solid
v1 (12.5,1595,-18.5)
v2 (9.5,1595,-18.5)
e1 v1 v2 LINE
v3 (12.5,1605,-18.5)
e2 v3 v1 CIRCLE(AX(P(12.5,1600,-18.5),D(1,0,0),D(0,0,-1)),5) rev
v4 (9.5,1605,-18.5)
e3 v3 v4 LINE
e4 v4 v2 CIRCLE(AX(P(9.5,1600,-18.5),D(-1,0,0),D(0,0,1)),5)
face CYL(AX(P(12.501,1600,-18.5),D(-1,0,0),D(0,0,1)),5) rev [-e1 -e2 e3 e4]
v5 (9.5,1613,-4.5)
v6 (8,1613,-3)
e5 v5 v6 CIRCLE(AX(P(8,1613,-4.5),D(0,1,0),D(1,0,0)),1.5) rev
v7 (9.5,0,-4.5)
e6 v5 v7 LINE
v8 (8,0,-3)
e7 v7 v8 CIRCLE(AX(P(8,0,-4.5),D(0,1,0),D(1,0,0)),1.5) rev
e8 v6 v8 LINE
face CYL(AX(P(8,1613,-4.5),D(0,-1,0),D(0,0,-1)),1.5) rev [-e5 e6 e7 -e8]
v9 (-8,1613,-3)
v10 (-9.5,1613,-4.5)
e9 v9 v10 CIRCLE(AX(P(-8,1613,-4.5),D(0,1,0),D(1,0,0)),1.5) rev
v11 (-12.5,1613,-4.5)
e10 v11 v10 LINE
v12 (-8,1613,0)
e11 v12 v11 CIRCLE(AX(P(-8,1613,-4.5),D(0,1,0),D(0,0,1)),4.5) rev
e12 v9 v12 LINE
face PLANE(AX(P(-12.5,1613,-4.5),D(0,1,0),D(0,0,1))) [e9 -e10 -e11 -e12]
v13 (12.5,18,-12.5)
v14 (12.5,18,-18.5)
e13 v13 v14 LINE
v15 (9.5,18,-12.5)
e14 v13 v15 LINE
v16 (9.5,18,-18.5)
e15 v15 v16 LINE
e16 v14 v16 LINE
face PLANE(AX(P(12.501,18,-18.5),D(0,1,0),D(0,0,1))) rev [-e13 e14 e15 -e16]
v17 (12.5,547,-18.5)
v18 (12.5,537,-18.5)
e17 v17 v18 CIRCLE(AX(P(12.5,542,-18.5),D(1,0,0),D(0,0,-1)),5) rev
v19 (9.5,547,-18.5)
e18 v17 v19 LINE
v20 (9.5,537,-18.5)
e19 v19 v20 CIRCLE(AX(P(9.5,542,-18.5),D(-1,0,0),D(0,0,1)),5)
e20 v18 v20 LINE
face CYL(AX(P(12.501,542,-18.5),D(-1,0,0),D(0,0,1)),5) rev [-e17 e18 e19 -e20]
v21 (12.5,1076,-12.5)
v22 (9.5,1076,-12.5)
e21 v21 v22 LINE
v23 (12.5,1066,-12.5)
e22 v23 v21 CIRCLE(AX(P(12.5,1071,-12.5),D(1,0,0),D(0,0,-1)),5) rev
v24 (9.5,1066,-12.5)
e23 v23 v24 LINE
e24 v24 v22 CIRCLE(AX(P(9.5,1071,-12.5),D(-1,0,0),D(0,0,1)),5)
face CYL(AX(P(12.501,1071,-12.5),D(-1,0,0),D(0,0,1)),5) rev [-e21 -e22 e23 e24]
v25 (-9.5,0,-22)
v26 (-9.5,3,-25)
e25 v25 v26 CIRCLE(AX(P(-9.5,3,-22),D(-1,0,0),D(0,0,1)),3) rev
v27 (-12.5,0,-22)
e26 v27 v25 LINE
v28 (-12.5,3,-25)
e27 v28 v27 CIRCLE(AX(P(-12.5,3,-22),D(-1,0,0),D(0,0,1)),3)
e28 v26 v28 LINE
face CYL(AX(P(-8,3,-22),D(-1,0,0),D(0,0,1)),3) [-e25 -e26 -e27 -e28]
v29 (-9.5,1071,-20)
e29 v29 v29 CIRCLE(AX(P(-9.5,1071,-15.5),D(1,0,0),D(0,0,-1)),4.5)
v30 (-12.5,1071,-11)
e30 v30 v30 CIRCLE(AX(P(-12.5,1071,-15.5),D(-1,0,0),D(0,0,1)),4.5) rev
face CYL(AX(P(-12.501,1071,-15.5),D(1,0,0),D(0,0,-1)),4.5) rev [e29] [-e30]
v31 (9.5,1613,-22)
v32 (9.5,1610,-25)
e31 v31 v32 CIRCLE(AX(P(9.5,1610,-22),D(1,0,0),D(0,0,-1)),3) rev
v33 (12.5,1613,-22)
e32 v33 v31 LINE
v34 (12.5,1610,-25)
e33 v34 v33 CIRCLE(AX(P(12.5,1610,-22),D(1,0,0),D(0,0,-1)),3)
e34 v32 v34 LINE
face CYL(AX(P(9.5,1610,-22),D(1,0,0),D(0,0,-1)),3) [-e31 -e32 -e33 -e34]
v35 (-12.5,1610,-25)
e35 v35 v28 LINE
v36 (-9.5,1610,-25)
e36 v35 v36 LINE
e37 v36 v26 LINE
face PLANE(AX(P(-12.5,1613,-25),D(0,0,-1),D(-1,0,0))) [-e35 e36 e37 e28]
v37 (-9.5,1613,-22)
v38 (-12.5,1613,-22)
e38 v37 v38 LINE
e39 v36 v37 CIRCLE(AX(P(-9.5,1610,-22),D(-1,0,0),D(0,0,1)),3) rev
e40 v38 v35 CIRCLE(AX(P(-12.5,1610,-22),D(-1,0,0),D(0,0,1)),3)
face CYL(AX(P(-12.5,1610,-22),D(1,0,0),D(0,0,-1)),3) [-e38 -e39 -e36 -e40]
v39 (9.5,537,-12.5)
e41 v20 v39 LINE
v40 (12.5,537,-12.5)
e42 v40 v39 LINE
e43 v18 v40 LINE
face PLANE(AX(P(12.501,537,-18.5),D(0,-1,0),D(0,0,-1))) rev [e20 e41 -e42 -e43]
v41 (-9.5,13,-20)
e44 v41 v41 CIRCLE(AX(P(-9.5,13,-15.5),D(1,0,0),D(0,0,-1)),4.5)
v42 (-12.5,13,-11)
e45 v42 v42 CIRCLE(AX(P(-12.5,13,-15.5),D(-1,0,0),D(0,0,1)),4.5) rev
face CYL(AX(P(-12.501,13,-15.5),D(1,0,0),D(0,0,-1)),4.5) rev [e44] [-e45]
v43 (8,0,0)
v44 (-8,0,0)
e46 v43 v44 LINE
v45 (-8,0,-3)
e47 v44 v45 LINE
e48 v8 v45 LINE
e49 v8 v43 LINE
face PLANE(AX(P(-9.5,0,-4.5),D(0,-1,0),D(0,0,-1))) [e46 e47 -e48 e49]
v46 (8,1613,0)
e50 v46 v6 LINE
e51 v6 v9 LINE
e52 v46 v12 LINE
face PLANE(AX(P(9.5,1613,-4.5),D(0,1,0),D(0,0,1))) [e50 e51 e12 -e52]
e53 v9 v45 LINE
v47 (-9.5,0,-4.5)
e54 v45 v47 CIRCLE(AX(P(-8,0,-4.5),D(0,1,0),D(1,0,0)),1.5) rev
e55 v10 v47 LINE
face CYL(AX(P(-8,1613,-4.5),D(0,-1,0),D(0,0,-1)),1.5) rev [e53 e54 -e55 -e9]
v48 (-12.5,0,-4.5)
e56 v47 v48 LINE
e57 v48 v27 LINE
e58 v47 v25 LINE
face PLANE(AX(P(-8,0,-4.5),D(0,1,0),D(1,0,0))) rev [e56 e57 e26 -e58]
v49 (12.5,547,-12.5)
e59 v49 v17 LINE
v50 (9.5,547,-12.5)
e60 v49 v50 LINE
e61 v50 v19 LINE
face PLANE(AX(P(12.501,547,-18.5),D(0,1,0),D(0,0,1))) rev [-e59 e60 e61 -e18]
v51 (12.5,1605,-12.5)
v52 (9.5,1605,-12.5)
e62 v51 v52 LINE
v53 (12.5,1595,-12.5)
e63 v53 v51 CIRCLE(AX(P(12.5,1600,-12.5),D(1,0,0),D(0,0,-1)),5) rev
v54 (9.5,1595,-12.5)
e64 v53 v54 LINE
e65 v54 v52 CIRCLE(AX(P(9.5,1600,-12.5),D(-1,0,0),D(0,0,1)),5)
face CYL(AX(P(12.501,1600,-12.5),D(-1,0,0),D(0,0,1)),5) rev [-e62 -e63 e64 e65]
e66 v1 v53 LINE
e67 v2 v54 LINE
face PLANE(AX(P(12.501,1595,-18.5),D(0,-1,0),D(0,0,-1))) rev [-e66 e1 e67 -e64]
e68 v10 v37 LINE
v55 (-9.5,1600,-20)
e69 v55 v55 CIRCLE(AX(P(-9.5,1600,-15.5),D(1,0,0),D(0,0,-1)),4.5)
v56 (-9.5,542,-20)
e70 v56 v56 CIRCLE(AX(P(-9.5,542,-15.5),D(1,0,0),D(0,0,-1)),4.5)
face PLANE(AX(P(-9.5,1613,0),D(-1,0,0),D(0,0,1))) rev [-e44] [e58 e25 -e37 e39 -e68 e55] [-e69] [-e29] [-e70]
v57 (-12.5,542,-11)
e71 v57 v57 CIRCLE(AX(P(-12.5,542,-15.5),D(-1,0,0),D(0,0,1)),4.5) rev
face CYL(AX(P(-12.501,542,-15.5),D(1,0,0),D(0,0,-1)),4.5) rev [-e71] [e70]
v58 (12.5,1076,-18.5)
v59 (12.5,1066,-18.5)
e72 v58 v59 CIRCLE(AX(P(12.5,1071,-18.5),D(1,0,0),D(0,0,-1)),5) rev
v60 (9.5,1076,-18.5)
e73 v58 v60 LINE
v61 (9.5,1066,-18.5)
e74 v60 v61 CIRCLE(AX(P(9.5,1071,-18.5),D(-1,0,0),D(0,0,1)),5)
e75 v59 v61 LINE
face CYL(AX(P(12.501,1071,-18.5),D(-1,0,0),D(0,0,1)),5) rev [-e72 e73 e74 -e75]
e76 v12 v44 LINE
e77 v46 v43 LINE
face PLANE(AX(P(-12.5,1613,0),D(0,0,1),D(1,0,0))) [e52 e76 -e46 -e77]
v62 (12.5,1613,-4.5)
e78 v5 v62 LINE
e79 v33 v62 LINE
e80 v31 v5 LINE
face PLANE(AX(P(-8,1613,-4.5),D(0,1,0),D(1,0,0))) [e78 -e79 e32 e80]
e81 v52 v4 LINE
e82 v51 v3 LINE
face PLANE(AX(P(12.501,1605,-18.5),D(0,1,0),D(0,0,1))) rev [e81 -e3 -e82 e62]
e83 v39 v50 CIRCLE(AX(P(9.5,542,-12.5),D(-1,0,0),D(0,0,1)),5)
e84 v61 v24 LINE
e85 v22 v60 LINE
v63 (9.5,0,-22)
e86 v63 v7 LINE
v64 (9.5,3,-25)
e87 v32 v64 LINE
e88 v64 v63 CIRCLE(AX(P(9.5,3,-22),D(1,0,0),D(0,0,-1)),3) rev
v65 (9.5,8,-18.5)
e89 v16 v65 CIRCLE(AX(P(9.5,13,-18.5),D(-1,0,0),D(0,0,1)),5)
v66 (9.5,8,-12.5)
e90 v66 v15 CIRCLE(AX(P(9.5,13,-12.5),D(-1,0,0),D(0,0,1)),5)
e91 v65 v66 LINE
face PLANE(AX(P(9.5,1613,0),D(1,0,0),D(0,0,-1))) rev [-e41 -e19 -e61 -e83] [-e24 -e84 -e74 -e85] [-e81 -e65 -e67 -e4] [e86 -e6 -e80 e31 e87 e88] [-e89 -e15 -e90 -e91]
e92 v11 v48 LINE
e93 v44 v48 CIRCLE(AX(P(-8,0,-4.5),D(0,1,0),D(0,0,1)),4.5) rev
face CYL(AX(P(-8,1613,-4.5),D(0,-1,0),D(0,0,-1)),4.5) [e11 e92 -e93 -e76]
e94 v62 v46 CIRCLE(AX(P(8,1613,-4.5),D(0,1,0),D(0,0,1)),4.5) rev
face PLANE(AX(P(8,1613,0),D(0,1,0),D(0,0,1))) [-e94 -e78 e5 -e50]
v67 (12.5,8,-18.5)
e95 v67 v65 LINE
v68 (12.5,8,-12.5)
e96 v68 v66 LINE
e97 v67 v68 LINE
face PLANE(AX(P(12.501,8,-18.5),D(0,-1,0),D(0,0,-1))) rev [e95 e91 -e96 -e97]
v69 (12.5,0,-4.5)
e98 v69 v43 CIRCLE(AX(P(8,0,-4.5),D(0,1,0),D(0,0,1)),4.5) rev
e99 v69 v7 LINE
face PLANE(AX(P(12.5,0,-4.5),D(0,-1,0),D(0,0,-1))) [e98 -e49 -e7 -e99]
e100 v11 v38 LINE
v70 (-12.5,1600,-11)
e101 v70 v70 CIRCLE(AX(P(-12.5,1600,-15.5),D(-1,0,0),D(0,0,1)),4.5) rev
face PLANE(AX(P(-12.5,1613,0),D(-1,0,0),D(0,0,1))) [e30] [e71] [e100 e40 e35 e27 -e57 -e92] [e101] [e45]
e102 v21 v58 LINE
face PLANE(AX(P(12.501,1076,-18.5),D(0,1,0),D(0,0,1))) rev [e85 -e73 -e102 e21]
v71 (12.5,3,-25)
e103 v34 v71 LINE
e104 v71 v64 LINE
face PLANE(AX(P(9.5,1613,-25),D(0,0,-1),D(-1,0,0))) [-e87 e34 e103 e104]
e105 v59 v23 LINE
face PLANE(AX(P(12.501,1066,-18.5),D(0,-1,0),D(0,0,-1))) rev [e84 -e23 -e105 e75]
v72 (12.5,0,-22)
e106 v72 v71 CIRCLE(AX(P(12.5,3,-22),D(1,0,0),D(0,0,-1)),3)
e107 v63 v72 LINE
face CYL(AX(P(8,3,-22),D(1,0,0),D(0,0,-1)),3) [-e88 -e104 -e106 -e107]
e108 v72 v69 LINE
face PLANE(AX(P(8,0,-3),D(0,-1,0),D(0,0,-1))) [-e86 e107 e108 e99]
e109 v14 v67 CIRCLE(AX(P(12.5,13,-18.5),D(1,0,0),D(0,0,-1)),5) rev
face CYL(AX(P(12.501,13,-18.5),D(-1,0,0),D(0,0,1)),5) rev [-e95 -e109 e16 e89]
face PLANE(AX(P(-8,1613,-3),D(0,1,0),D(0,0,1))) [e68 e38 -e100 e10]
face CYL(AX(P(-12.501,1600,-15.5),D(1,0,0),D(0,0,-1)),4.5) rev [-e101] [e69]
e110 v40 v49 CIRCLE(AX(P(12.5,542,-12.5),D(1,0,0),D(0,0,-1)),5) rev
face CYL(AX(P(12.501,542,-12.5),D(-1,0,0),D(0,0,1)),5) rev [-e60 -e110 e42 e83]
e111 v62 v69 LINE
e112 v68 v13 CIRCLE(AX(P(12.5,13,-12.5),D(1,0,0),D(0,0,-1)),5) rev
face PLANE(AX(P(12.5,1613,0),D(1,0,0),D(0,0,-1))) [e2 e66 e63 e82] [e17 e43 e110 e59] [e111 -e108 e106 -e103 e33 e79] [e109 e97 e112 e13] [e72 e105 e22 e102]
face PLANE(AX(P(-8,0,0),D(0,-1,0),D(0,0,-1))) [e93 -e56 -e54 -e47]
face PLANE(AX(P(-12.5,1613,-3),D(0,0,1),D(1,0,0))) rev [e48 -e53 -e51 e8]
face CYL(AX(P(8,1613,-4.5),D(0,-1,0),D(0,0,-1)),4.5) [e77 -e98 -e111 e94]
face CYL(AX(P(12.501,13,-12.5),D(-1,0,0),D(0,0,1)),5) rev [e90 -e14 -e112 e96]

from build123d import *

# Parameters (mm, degrees)
BASE_FLANGE1_DEPTH = 1613
CUT_EXTRUDE1_REACH = 1615.344
SKETCH6_R          = 4.5
FILLET1_R          = 3
CUT_EXTRUDE2_REACH = 1615.344
LPATTERN1_COUNT    = 4
LPATTERN1_PITCH    = 529


# Sheet-metal steps are written as plain solids
with BuildPart() as part:
    # Sketch1 → Base-Flange1 (new body)
    with BuildSketch(Plane(origin=(0, 0, 0), x_dir=(1, 0, 0), z_dir=(0, 1, 0))):
        with BuildLine():
            Line((-12.5, 25), (-12.5, 4.5))
            ThreePointArc((-12.5, 4.5), (-11.181980515, 1.318019485), (-8, 0))
            Line((-8, 0), (8, 0))
            ThreePointArc((8, 0), (11.181980515, 1.318019485), (12.5, 4.5))
            Line((12.5, 4.5), (12.5, 25))
            Line((12.5, 25), (9.5, 25))
            Line((9.5, 25), (9.5, 4.5))
            ThreePointArc((9.5, 4.5), (9.060660172, 3.439339828), (8, 3))
            Line((8, 3), (-8, 3))
            ThreePointArc((-8, 3), (-9.060660172, 3.439339828), (-9.5, 4.5))
            Line((-9.5, 4.5), (-9.5, 25))
            Line((-9.5, 25), (-12.5, 25))
        make_face()
    extrude(amount=BASE_FLANGE1_DEPTH)

    # Sketch6 → Cut-Extrude1 (cut, up to next)
    with BuildSketch(Plane(origin=(-9.5, 0, 0), x_dir=(0, 0, -1), z_dir=(1, 0, 0)), mode=Mode.PRIVATE) as cut_extrude1_sk1:
        with Locations((15.5, 13)):
            Circle(SKETCH6_R)
    cut_extrude1_tool1 = extrude(cut_extrude1_sk1.sketch, amount=-CUT_EXTRUDE1_REACH, mode=Mode.PRIVATE) & part.part
    cut_extrude1 = cut_extrude1_tool1.solids().sort_by_distance((-9.5, 13, -15.5))[0]
    add(cut_extrude1, mode=Mode.SUBTRACT)

    # Fillet1
    fillet1_edges = [part.edges().sort_by_distance(p)[0] for p in [
        (11, 0, -25),
        (-11, 0, -25),
        (11, 1613, -25),
        (-11, 1613, -25),
    ]]
    fillet(fillet1_edges, radius=FILLET1_R)

    # Sketch7 → Cut-Extrude2 (cut, up to next)
    with BuildSketch(Plane.ZY.offset(-9.5), mode=Mode.PRIVATE) as cut_extrude2_sk1:
        with BuildLine():
            Line((-18.5, 18), (-12.5, 18))
            ThreePointArc((-12.5, 18), (-7.5, 13), (-12.5, 8))
            Line((-12.5, 8), (-18.5, 8))
            ThreePointArc((-18.5, 8), (-23.5, 13), (-18.5, 18))
        make_face()
    cut_extrude2_tool1 = extrude(cut_extrude2_sk1.sketch, amount=-CUT_EXTRUDE2_REACH, mode=Mode.PRIVATE) & part.part
    cut_extrude2 = cut_extrude2_tool1.solids().sort_by_distance((9.5, 13, -15.5))[0]
    add(cut_extrude2, mode=Mode.SUBTRACT)

    # LPattern1: Cut-Extrude1, Cut-Extrude2 ×4
    with Locations(*[(0, i * LPATTERN1_PITCH, 0) for i in range(1, LPATTERN1_COUNT)]):
        add(cut_extrude1, mode=Mode.SUBTRACT)
        add(cut_extrude2, mode=Mode.SUBTRACT)


solid = part.part
